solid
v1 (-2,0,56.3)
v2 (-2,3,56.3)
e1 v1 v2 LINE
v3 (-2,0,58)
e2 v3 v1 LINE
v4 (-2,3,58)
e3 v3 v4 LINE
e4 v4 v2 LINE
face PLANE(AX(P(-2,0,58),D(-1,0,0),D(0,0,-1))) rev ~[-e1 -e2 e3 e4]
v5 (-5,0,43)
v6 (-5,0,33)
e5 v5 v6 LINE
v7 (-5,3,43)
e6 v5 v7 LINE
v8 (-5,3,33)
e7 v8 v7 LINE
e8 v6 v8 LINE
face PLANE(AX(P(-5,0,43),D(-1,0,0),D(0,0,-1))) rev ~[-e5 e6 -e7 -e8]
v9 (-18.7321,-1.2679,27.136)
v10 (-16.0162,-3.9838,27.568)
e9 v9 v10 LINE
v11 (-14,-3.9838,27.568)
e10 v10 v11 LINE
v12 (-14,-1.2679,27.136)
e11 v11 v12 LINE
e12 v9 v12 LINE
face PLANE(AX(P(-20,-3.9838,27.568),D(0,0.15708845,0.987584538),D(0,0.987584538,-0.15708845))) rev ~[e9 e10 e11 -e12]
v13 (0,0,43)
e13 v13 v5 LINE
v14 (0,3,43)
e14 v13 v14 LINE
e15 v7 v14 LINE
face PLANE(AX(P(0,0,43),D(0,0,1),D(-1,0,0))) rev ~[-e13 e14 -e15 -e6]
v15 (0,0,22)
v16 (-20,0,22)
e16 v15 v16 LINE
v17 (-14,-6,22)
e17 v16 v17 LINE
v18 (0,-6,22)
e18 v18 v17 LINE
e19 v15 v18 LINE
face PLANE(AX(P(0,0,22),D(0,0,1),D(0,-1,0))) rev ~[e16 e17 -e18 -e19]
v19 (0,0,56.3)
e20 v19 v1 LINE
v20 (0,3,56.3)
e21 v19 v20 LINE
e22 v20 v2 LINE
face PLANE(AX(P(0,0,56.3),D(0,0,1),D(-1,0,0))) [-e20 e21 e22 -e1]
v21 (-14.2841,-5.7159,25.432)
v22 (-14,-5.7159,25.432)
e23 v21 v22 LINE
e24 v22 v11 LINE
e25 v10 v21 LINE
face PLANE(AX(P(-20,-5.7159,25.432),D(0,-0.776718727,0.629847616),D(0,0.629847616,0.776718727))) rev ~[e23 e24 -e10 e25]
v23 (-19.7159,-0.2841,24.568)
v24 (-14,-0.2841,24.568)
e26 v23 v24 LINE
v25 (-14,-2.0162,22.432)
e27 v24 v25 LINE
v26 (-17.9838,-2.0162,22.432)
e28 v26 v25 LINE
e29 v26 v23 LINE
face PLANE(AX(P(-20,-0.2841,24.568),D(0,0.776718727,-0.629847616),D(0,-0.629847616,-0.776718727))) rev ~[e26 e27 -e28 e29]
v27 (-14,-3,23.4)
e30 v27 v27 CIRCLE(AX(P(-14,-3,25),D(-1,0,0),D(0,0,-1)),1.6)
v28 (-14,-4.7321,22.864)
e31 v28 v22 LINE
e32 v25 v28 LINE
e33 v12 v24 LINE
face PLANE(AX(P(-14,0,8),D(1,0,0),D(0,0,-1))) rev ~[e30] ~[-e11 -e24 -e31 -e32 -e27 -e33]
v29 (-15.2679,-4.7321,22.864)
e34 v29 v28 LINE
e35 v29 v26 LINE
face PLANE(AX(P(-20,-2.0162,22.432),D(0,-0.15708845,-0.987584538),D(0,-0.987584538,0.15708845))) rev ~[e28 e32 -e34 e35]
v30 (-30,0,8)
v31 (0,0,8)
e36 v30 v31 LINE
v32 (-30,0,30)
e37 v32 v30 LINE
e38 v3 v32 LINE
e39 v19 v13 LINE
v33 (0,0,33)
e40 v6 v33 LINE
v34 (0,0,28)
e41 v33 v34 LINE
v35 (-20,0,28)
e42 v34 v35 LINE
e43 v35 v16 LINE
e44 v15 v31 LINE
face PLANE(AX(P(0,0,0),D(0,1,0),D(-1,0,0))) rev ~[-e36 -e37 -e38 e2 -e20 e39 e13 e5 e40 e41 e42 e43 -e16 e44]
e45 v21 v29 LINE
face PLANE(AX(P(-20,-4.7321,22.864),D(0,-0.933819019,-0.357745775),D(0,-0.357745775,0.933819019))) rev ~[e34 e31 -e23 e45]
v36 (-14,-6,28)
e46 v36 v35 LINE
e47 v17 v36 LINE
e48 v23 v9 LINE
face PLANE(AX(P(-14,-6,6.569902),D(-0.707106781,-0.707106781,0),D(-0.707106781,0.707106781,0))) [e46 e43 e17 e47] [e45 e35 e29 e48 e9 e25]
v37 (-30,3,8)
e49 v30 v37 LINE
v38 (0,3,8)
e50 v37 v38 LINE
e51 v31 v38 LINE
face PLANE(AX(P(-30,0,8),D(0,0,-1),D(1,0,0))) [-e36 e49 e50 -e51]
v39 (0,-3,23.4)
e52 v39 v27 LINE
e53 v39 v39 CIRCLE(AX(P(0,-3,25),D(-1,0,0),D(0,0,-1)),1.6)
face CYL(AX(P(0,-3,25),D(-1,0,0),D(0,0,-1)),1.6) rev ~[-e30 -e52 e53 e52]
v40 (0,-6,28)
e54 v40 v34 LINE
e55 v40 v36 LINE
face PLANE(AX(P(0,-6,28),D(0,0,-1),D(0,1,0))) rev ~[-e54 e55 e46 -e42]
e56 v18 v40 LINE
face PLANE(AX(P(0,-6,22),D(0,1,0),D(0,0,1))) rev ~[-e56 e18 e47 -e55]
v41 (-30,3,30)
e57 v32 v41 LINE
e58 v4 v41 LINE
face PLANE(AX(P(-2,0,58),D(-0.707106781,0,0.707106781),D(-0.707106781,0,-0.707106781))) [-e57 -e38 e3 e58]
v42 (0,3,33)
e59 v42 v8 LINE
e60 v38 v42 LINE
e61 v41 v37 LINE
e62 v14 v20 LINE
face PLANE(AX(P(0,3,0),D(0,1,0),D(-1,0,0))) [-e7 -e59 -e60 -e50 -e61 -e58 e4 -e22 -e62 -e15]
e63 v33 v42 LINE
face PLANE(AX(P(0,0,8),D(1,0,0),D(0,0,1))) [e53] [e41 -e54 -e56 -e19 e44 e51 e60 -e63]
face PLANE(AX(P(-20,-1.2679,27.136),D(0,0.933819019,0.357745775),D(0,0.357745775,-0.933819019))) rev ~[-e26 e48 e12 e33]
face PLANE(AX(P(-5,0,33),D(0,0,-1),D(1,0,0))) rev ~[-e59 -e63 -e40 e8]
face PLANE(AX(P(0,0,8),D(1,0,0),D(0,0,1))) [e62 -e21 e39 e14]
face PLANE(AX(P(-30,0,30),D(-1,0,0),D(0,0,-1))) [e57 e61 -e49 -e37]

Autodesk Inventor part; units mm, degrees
ref_plane "YZ Plane" through (0, 0, 0) normal (1, 0, 0) x (0, 1, 0)
ref_plane "XZ Plane" through (0, 0, 0) normal (0, 1, 0) x (-1, 0, 0)
ref_plane "XY Plane" through (0, 0, 0) normal (0, 0, 1) x (1, 0, 0)
sketch "Szkic1" plane through (0, 0, 0) normal (0, 1, 0) x (-1, 0, 0)
  line L0 (0, 8) -> (0, 56.3)
  line L1 (0, 58) -> (2, 58) construction
  line L2 (2, 58) -> (2, 56.3) construction
  line L3 (2, 56.3) -> (0, 56.3) construction
  line L4 (0, 56.3) -> (0, 58) construction
  line L5 (30, 8) -> (30, 66.5) construction
  line L6 (2, 58) -> (30, 30)
  line L7 (2, 58) -> (41.598, 58) construction
  line L8 (30, 30) -> (30, 8)
  line L9 (2, 58) -> (2, 56.3)
  line L10 (0, 56.3) -> (2, 56.3)
  line L11 (2, 56.3) -> (2, 54.3) construction
  line L12 (0, 43) -> (5, 43)
  line L13 (5, 43) -> (5, 33)
  line L14 (5, 33) -> (0, 33)
  line L15 (0, 33) -> (0, 43)
  line L16 (30, 8) -> (0, 8)
  line L17 (30, 8) -> (30, 30)
  point P0 (0, 0)
  point P1 (0, 33)
  dimension "d0" = 58
  dimension "d1" = 2
  dimension "d2" = 1.7
  dimension "d4" = 45
  dimension "d7" = 2
  dimension "d8" = 5
  dimension "d9" = 10
  dimension "d13" = 30
  dimension "d14" = 22
  dimension "d15" = 58.5
  dimension "d16" = 30
  dimension "d17" = 25
  dimension "d18" = 8
extrude "Wyciągnięcie proste1" add sketch "Szkic1" along normal blind 3
extrude "Wyciągnięcie proste2" cut sketch "Szkic1" along normal blind 10 contours L0 L12 L13 L14
sketch "Sketch2" plane through (0, 0, 8) normal (1, 0, 0) x (0, 0, -1)
  line L0 (-25, 3) -> (0, 3) projected
  line L1 (-25, 0) -> (0, 0) projected
  line L2 (-20, 0) -> (-14, 0)
  line L3 (-14, 0) -> (-14, -6)
  line L4 (-14, -6) -> (-20, -6)
  line L5 (-20, -6) -> (-20, 0)
  line L6 (-14.432, -2.0162) -> (-14.864, -4.7321)
  line L7 (-14.864, -4.7321) -> (-17.432, -5.7159)
  line L8 (-17.432, -5.7159) -> (-19.568, -3.9838)
  line L9 (-19.568, -3.9838) -> (-19.136, -1.2679)
  line L10 (-19.136, -1.2679) -> (-16.568, -0.2841)
  line L11 (-16.568, -0.2841) -> (-14.432, -2.0162)
  point P0 (8, 0)
  point P1 (-17, -3)
  point P2 (-17, -3)
  point P3 (-14, 0)
  point P4 (-17, -6)
  point P5 (-17, -3)
  dimension "d43" = 6
  dimension "d44" = 6
  dimension "d45" = 5
  dimension "d65" = 3
  dimension "d66" = 3
  dimension "d67" = 2.75
  dimension "d68" = 1.7321
extrude "Extrusion5" add sketch "Sketch2" against normal blind 20 contours L1 L3 L4 L5 | L6 L7 L8 L9 L10 L11
hole "Hole2" at (0, -3, 25) direction (-1, 0, 0) diameter 3.2 depth 30 clearance for "Countersunk Flat Head Screw ISO 2009/7046" size "M3" standard "ISO"
extrude "Extrusion7" cut sketch "Sketch2" along normal blind 6 from surface at -20 contours L6 L7 L8 L9 L10 L11
chamfer "Chamfer4" distance 6 angle 45 1 edges at (-20, -6, 25)
properties part number "side_wall_left"
